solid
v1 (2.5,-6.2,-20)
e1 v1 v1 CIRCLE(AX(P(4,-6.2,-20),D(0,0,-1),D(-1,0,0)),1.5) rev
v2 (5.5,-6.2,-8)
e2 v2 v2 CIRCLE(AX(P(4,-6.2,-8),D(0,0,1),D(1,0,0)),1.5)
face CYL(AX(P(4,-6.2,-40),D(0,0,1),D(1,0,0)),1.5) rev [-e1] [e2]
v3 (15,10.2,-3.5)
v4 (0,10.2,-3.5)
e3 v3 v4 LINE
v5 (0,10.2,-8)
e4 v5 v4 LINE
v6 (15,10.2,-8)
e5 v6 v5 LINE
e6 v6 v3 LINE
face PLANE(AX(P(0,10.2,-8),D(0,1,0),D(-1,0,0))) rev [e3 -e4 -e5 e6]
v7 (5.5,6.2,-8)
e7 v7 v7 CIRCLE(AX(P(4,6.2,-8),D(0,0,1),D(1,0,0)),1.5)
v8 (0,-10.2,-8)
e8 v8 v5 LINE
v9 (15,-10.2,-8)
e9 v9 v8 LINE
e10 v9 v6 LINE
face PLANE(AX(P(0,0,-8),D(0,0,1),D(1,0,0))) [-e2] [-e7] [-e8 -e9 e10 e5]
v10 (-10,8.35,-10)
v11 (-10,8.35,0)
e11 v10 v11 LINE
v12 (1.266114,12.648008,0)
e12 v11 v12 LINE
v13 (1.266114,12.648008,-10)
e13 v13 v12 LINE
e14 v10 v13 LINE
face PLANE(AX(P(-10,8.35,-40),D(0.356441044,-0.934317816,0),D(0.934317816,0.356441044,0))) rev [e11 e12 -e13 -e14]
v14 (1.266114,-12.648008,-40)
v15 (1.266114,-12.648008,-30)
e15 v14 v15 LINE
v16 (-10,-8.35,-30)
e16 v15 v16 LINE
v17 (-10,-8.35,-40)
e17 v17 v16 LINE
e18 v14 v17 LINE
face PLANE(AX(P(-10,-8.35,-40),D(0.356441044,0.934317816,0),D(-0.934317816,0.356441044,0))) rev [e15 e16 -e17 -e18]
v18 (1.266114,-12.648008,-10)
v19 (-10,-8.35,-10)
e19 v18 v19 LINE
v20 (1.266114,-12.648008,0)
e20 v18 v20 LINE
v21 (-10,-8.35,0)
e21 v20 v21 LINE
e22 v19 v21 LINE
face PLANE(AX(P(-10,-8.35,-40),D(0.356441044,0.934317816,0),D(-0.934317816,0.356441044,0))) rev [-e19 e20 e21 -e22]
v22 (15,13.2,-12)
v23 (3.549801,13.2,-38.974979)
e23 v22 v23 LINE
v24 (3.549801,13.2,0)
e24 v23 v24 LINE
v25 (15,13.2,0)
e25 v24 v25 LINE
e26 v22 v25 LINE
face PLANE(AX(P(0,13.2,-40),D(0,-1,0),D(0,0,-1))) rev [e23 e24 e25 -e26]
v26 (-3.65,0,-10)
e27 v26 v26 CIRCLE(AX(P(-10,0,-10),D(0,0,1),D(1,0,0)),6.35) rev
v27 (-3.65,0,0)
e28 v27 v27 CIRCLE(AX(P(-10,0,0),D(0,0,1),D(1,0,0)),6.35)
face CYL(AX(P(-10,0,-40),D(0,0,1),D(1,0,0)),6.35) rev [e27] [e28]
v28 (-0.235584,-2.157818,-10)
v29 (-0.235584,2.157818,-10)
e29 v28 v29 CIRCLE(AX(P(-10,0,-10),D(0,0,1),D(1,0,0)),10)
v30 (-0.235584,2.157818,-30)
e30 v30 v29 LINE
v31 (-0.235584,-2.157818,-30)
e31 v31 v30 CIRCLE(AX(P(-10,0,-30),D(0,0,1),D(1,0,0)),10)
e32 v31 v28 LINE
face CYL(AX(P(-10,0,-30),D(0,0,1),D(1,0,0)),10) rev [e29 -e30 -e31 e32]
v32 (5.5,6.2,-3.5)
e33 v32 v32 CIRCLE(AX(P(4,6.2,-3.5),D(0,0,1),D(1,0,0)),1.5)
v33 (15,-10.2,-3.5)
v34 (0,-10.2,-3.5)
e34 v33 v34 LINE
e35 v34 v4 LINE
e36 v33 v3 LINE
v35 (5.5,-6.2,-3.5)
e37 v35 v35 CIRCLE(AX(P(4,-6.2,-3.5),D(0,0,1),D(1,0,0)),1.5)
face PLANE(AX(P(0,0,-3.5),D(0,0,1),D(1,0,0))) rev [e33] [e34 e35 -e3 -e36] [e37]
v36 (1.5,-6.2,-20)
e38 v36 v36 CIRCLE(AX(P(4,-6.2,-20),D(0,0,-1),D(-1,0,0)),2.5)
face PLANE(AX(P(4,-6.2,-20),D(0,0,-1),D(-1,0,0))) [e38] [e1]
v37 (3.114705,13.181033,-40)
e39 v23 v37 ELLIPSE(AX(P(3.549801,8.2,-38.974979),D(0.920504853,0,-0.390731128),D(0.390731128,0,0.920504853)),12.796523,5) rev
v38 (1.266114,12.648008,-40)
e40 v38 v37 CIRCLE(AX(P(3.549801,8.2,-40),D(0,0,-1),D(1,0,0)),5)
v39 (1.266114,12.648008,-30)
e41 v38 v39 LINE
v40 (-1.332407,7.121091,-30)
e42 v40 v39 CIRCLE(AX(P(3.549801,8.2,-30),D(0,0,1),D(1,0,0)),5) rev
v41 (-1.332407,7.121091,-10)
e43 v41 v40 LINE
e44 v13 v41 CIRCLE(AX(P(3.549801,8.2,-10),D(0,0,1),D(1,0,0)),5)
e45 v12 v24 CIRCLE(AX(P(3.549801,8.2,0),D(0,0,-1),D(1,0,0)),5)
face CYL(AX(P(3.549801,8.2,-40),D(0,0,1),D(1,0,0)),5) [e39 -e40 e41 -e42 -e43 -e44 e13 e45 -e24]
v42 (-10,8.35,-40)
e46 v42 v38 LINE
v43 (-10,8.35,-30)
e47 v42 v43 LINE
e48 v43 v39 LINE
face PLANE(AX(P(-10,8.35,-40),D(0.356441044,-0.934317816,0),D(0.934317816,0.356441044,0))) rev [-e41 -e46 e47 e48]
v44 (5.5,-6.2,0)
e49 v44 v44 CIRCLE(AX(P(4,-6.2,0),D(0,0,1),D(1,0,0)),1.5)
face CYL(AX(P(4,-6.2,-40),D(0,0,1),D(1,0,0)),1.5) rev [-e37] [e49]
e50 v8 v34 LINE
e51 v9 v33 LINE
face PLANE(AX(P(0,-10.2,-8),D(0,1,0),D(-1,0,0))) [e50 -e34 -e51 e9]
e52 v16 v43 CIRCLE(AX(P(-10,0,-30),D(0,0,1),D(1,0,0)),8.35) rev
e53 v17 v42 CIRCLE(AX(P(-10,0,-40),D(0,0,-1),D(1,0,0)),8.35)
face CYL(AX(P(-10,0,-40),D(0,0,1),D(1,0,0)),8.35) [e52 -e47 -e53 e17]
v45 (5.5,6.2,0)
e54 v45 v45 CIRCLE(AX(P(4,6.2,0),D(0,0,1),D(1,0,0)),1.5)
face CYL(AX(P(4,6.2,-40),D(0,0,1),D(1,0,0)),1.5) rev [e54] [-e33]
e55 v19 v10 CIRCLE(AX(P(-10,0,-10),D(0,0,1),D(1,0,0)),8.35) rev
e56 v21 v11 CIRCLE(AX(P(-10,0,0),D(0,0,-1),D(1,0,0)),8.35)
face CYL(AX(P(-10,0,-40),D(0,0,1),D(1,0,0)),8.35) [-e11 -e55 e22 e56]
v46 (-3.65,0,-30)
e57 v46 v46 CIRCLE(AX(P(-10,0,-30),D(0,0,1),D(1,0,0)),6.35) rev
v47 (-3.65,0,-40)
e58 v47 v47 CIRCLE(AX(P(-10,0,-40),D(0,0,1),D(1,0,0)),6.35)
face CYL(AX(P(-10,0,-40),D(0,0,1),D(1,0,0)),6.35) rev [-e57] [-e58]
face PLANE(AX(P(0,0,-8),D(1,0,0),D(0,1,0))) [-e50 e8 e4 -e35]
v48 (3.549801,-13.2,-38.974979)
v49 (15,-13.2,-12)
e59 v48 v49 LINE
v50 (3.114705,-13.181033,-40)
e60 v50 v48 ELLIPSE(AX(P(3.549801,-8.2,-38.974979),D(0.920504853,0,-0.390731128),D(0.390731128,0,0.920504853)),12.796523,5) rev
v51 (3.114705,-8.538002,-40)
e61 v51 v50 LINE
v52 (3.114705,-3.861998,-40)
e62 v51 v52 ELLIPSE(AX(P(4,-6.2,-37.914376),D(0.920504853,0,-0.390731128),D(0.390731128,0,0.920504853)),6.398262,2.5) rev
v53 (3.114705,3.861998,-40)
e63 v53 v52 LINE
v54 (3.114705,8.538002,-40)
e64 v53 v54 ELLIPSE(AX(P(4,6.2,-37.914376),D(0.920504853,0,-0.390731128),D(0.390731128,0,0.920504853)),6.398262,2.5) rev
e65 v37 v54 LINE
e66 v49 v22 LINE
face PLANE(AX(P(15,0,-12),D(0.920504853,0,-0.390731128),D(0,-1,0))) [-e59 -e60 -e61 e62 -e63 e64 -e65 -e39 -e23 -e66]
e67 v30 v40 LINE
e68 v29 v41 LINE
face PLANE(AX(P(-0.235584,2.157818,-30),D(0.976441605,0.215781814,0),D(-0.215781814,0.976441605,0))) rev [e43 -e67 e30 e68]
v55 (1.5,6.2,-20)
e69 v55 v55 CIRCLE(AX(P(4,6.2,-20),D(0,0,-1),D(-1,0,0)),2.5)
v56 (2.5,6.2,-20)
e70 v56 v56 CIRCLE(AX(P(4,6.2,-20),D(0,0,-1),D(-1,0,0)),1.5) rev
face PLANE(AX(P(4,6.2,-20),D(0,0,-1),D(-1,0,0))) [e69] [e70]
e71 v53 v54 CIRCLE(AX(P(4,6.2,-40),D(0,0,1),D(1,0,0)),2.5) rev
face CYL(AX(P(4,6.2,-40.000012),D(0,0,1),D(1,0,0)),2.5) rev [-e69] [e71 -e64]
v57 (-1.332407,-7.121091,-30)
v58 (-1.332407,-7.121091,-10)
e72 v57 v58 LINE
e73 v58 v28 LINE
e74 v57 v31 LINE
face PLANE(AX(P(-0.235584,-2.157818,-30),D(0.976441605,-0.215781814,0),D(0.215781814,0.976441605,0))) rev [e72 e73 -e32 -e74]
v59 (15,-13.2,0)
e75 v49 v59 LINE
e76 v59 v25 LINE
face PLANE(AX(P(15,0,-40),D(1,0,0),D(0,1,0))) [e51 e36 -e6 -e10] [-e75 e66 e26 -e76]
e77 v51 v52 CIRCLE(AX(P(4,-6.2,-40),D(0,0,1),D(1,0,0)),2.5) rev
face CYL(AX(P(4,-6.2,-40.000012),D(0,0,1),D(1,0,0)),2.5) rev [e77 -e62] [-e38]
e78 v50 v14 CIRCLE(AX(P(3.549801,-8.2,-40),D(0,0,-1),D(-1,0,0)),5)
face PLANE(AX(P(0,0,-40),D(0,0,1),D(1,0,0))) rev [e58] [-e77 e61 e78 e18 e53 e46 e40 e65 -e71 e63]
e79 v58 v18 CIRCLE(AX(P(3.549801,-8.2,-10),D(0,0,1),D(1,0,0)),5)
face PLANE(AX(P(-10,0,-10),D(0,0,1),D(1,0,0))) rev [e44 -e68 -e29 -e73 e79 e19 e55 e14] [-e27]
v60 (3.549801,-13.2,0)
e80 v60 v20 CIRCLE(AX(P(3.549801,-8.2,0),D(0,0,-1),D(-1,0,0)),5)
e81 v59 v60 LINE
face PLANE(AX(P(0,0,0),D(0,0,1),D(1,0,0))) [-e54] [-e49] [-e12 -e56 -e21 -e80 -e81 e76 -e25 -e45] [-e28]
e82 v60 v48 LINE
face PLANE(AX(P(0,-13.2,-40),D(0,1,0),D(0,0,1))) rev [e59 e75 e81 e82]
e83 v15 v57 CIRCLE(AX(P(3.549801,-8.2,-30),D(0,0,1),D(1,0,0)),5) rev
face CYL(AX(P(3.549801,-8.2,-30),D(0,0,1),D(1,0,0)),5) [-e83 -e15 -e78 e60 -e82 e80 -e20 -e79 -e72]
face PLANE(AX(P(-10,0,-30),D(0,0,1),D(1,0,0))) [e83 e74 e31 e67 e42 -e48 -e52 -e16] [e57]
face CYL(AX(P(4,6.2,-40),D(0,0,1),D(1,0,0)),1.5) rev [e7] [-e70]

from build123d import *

# Parameters (mm, degrees)
SKETCH1_R               = 6.35
SKETCH1_W               = 15
SKETCH1_H               = 20.4
SKETCH1_R_2             = 1.5
BOSS_EXTRUDE1_DEPTH     = 40
CUT_EXTRUDE1_START      = -3.5
SKETCH1_7_W             = 15
SKETCH1_7_H             = 20.4
SKETCH1_7_R             = 1.5
CUT_EXTRUDE1_DEPTH      = 4.5
CUT_EXTRUDE2_START      = -10
CUT_EXTRUDE2_DEPTH      = 20
FILLET1_R               = 5
CUT_EXTRUDE3_DEPTH      = 39.804456485
CUT_EXTRUDE3_DEPTH_BACK = 39.804456485
CHAMFER1_SIZE           = 28
CHAMFER1_SIZE_2         = 11.885294854
CUT_EXTRUDE5_DEPTH      = 46.945211938
CUT_EXTRUDE5_DEPTH_BACK = 20
SKETCH5_R               = 2.5


with BuildPart() as part:
    # Sketch1 → Boss-Extrude1 (new body)
    # profile 1 of 2: a face of its own
    with BuildSketch(Plane.XY):
        Polygon((-20.773681501, -13.2), (-15, -13.2), (15, -13.2), (15, -10.2), (0, -10.2), (0, 10.2), (15, 10.2), (15, 13.2), (-14.707827622, 13.2), (-15, 13.2), (-20.773681501, 13.2), align=None)
        with Locations((-10, 0)):
            Circle(SKETCH1_R, mode=Mode.SUBTRACT)
    # profile 2 of 2: a face of its own
    with BuildSketch(Plane.XY):
        with Locations((7.5, 0)):
            Rectangle(SKETCH1_W, SKETCH1_H)
        with Locations((4, -6.2)):
            Circle(SKETCH1_R_2, mode=Mode.SUBTRACT)
        with Locations((4, 6.2)):
            Circle(SKETCH1_R_2, mode=Mode.SUBTRACT)
    extrude(amount=-BOSS_EXTRUDE1_DEPTH)

    # Sketch1<7> → Cut-Extrude1 (cut)
    with BuildSketch(Plane.XY.offset(CUT_EXTRUDE1_START)):
        with Locations((7.5, 0)):
            Rectangle(SKETCH1_7_W, SKETCH1_7_H)
        with Locations((4, -6.2)):
            Circle(SKETCH1_7_R, mode=Mode.SUBTRACT)
        with Locations((4, 6.2)):
            Circle(SKETCH1_7_R, mode=Mode.SUBTRACT)
    extrude(amount=-CUT_EXTRUDE1_DEPTH, mode=Mode.SUBTRACT)

    # Sketch2 → Cut-Extrude2 (cut)
    with BuildSketch(Plane.XY.offset(CUT_EXTRUDE2_START)):
        with BuildLine():
            Line((-0.235583945, 2.157818136), (-2.675772908, 13.2))
            Line((-2.675772908, 13.2), (-11.927619652, 13.2))
            Line((-11.927619652, 13.2), (-20.773681501, 13.2))
            Line((-20.773681501, 13.2), (-20.773681501, -13.2))
            Line((-20.773681501, -13.2), (-2.675772908, -13.2))
            Line((-2.675772908, -13.2), (-0.235583945, -2.157818136))
            ThreePointArc((-0.235583945, -2.157818136), (0, 0), (-0.235583945, 2.157818136))
        make_face()
    extrude(amount=-CUT_EXTRUDE2_DEPTH, mode=Mode.SUBTRACT)

    # Fillet1
    fillet1_edges = [part.edges().sort_by_distance(p)[0] for p in [
        (-2.675772908, 13.2, -20),
        (-2.675772908, -13.2, -20),
    ]]
    fillet(fillet1_edges, radius=FILLET1_R)

    # Sketch3 → Cut-Extrude3 (cut, two sides: drawn at the far end of the back side and taken through both)
    with BuildSketch(Plane.XY.offset(-30).offset(-CUT_EXTRUDE3_DEPTH_BACK)):
        with BuildLine():
            Line((-10, 8.35), (1.266113946, 12.648007971))
            ThreePointArc((1.266113946, 12.648007971), (2.375075148, 13.060043202), (3.549800678, 13.2))
            Line((3.549800678, 13.2), (-20.773681501, 13.2))
            Line((-20.773681501, 13.2), (-20.773681501, -13.2))
            Line((-20.773681501, -13.2), (3.549800678, -13.2))
            ThreePointArc((3.549800678, -13.2), (2.375075148, -13.060043202), (1.266113946, -12.648007971))
            Line((1.266113946, -12.648007971), (-10, -8.35))
            ThreePointArc((-10, -8.35), (-18.35, 0), (-10, 8.35))
        make_face()
    extrude(amount=CUT_EXTRUDE3_DEPTH + CUT_EXTRUDE3_DEPTH_BACK, mode=Mode.SUBTRACT)

    # Chamfer1
    # the kernel refuses this chamfer: 28, 11.885294854 mm, written as the material it takes off along each edge
    with BuildSketch(Plane(origin=(15, 85.785659069, -40), x_dir=(0.01507249742986372, 0, 0.9998864034585262), z_dir=(0, -1, 0))) as chamfer1_piece_1:
        Polygon((CHAMFER1_SIZE * 0.999886403459, CHAMFER1_SIZE * 0.0150724974299), (-CHAMFER1_SIZE_2 * 0.0150724974297, CHAMFER1_SIZE_2 * 0.999886403448), (0, 0), align=None)
    extrude(amount=171.571318139, mode=Mode.SUBTRACT)

    # Sketch5 → Cut-Extrude5 (cut, two sides: drawn at the far end of the back side and taken through both)
    with BuildSketch(Plane(origin=(0, 0, -40), x_dir=(-1, 0, 0), z_dir=(0, 0, -1)).offset(-CUT_EXTRUDE5_DEPTH_BACK)):
        with Locations(Location((-4, 6.2, 0), (0, 0, 290.739394744))):
            Circle(SKETCH5_R)
        with Locations(Location((-4, -6.2, 0), (0, 0, 290.739394744))):
            Circle(SKETCH5_R)
    extrude(amount=CUT_EXTRUDE5_DEPTH + CUT_EXTRUDE5_DEPTH_BACK, mode=Mode.SUBTRACT)


solid = part.part
